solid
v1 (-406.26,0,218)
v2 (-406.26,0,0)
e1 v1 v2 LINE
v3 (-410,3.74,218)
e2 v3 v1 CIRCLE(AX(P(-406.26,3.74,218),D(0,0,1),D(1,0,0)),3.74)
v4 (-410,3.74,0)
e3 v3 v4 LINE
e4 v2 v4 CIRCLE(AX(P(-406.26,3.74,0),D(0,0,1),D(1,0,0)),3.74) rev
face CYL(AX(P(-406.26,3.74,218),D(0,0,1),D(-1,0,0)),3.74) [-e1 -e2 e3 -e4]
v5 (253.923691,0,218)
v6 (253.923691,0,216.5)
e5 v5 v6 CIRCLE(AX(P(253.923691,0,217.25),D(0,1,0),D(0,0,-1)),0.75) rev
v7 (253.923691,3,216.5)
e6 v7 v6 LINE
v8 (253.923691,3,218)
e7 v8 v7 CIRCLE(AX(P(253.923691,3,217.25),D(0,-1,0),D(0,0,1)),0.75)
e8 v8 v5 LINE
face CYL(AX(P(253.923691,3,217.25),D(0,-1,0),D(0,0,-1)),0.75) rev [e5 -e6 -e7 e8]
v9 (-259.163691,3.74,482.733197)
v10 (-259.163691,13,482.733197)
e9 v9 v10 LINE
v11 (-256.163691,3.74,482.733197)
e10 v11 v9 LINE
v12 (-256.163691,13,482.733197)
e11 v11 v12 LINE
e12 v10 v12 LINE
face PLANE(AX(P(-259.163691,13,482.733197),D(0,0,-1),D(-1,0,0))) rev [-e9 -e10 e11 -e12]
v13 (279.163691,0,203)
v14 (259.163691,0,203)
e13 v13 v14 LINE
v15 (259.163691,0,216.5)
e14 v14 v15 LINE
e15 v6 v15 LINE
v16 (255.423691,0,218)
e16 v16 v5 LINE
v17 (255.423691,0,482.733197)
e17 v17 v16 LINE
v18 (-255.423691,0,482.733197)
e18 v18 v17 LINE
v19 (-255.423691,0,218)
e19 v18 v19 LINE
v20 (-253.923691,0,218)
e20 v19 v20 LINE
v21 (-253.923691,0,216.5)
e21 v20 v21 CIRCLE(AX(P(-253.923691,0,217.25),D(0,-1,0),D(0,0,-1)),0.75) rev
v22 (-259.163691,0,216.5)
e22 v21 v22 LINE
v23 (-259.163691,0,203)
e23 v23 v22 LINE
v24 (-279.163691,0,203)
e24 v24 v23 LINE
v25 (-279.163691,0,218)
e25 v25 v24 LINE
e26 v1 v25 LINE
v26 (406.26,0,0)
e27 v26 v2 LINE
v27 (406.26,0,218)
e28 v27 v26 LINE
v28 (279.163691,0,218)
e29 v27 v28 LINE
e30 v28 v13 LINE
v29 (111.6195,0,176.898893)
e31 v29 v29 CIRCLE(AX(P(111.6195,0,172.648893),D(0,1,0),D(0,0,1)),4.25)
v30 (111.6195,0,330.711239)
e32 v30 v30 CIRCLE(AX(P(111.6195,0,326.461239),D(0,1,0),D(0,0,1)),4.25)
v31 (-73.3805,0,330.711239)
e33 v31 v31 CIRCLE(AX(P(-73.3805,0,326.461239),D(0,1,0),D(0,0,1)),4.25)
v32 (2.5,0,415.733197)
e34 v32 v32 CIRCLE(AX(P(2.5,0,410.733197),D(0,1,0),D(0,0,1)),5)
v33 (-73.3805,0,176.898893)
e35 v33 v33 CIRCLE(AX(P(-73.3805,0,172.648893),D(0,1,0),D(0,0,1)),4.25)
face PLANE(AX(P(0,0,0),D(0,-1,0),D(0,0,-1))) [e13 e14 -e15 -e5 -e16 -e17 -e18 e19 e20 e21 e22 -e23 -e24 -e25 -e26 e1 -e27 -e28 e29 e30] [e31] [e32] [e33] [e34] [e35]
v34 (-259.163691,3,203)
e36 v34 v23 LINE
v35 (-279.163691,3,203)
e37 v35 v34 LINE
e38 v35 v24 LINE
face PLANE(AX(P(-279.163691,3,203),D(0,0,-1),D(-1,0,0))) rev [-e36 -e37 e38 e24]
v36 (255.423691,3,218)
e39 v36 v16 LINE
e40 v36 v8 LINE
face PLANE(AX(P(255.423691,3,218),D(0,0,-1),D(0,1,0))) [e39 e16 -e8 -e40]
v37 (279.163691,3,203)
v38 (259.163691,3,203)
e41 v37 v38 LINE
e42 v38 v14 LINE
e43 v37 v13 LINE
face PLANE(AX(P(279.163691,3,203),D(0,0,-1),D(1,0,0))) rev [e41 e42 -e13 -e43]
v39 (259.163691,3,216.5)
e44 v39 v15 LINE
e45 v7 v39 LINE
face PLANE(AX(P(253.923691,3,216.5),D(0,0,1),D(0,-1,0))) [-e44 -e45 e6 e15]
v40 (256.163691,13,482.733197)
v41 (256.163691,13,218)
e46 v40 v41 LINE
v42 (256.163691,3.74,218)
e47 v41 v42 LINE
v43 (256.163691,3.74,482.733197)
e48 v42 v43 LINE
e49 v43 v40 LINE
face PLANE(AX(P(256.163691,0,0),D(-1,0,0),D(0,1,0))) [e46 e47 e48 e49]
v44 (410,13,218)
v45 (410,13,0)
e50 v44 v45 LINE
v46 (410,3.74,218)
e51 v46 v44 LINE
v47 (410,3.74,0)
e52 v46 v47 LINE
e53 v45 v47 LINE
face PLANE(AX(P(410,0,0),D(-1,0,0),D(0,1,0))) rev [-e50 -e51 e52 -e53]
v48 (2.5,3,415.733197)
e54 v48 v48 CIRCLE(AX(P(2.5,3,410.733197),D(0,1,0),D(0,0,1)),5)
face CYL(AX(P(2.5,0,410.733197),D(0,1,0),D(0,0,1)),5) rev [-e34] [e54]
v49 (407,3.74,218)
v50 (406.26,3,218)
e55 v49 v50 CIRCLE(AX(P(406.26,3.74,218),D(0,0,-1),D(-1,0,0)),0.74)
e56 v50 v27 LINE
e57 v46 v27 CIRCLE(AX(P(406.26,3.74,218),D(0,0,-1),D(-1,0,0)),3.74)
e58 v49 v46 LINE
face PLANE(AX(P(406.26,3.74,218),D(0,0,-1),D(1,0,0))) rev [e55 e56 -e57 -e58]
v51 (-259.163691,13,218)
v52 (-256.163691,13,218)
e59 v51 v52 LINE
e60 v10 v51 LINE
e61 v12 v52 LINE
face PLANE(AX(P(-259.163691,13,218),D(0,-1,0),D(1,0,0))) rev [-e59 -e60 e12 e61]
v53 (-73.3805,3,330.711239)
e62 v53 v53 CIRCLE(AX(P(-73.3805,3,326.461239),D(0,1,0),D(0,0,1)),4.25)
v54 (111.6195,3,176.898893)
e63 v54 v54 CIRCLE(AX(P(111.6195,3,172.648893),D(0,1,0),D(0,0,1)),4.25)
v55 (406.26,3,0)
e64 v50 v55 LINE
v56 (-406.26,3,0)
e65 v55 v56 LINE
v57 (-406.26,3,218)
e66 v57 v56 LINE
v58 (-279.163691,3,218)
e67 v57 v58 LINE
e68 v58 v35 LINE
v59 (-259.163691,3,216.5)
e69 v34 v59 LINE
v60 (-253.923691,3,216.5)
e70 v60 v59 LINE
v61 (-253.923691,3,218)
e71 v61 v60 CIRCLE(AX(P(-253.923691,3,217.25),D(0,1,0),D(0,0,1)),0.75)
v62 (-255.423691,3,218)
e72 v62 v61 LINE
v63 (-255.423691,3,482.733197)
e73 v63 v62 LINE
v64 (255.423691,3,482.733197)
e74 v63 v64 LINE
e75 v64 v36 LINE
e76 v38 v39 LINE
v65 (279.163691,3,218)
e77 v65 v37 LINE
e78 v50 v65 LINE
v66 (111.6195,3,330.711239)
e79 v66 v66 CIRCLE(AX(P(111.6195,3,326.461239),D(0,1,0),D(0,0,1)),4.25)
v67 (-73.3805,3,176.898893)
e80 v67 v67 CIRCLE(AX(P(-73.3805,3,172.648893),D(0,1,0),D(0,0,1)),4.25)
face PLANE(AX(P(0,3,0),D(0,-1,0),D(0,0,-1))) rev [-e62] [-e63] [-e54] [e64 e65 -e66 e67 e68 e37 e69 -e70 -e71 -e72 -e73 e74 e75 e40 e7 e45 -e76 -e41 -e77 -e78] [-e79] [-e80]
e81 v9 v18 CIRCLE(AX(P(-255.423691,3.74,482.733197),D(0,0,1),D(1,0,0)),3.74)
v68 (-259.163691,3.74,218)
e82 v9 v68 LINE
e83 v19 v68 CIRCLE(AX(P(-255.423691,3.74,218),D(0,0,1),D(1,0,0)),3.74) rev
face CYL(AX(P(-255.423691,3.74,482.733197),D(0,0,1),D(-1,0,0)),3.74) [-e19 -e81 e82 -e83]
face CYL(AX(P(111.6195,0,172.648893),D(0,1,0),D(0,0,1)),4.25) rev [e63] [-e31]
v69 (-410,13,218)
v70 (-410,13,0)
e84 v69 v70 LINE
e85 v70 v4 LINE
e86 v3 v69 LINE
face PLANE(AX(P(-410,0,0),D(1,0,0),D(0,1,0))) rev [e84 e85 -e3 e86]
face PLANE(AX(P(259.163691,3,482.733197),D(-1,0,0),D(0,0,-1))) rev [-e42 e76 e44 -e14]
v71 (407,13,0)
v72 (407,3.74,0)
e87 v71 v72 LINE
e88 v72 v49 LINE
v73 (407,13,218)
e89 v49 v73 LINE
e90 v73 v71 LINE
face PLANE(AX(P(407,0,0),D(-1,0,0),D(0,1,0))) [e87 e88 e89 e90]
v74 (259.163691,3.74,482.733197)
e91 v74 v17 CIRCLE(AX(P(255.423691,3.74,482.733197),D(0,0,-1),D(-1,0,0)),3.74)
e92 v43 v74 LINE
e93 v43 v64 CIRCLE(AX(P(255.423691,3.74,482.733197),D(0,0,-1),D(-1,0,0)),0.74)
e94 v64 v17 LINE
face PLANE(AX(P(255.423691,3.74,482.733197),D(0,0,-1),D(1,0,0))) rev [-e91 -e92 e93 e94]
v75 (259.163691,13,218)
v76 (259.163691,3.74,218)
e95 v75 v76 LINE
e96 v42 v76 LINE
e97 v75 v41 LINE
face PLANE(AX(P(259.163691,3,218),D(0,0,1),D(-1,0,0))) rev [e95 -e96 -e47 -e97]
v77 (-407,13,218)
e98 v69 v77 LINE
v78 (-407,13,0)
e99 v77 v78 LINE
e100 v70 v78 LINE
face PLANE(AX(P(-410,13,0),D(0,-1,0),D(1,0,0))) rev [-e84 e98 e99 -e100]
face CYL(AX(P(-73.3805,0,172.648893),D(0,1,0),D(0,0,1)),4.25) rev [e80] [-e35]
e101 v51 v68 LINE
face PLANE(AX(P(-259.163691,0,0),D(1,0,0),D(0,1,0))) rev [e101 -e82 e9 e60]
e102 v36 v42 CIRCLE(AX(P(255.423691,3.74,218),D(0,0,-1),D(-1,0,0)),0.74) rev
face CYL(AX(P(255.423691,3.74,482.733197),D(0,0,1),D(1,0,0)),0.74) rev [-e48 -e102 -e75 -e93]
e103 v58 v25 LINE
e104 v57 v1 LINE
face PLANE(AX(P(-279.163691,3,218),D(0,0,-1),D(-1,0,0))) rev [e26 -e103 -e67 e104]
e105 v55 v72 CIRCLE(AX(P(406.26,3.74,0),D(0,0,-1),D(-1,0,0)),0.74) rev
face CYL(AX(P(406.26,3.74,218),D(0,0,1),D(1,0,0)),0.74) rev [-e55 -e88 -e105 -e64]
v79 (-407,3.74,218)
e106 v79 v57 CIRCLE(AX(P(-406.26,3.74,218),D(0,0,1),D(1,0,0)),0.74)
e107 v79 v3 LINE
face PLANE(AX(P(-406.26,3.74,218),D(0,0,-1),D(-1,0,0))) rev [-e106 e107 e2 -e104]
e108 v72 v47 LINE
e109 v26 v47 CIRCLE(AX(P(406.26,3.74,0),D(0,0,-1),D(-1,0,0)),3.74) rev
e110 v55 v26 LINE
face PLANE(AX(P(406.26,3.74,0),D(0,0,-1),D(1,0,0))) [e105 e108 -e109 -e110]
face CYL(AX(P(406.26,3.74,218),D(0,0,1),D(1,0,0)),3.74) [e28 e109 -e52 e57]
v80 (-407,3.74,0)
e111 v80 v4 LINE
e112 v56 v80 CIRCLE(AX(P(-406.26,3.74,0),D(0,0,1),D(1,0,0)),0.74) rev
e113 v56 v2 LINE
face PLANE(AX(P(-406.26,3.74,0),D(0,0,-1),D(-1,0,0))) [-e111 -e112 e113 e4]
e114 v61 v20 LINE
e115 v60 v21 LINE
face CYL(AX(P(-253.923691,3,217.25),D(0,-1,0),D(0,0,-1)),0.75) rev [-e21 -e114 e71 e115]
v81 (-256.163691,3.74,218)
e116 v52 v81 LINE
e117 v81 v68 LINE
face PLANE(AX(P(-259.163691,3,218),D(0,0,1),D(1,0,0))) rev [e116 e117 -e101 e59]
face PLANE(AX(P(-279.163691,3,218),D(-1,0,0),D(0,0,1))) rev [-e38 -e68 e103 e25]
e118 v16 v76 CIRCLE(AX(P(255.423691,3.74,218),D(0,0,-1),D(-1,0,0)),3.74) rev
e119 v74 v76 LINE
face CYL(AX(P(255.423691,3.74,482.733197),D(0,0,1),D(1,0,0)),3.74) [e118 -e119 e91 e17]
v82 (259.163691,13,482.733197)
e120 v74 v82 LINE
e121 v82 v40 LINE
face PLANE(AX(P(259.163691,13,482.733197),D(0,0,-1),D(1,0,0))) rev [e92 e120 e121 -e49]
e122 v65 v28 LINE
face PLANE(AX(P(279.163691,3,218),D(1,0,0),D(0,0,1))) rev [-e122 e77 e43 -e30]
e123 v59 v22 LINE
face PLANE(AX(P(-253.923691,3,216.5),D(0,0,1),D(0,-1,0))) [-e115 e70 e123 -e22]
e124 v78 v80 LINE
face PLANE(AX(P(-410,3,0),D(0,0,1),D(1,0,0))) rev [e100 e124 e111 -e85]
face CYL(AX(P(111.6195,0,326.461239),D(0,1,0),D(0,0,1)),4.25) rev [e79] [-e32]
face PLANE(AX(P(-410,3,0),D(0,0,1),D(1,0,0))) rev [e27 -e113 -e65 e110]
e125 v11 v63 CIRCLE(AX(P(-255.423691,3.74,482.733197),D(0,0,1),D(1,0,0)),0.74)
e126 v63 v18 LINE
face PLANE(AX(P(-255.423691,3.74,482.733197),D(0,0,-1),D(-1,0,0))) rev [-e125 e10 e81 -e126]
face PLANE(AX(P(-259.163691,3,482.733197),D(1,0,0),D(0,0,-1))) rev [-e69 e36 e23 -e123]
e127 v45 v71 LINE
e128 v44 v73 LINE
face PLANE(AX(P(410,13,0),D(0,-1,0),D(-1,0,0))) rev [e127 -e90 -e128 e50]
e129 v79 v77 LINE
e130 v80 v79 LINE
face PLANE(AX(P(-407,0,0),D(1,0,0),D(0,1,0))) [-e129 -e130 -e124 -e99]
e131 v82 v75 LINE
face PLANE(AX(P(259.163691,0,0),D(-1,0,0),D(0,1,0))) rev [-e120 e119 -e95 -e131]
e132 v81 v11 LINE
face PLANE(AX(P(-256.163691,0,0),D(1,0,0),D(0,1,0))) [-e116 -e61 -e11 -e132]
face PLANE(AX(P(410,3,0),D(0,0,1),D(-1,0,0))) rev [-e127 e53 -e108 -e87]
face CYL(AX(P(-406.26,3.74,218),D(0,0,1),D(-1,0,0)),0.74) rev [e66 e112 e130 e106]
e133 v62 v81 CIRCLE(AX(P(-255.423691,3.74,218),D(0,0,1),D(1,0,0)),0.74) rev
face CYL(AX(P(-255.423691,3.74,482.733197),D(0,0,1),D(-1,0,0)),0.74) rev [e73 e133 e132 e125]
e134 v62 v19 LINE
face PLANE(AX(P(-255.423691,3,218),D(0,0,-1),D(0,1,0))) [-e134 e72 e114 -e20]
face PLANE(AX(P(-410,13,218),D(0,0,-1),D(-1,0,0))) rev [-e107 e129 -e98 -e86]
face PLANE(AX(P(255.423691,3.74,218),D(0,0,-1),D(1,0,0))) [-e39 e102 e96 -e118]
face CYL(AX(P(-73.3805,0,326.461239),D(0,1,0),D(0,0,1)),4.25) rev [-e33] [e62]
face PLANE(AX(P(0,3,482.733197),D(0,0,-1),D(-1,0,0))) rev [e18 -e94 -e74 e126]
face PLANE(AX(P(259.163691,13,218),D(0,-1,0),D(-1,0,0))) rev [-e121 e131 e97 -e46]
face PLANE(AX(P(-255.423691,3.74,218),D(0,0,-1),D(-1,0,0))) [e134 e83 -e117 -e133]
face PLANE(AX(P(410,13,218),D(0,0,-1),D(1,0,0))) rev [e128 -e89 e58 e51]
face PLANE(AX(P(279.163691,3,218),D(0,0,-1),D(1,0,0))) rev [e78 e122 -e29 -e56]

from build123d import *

# Parameters (mm, degrees)
SM_BASE_FLANGE_1_DEPTH   = 3
SM_START                 = 216.5
SM_EDGE_FLANGE_1_DEPTH   = 266.233197448
SM_EDGE_FLANGE_1_2_DEPTH = 216.5
SM_START_2               = 218
SM_EDGE_FLANGE_1_3_DEPTH = 264.733197448
SM_EDGE_FLANGE_1_4_DEPTH = 218
SM_START_3               = -1
SM_EDGE_FLANGE_1_5_DEPTH = 4.74
SKETCH_14_R              = 5
SKETCH_14_R_2            = 4.25
CUT_EXTRUDE_1_DEPTH      = 10


with BuildPart() as part:
    # Базовая кромка1: sheet metal written as solids
    # Sketch 1 → Базовая кромка1 (new body)
    with BuildSketch(Plane(origin=(0, 0, 0), x_dir=(1, 0, 0), z_dir=(0, 1, 0))):
        Polygon((-410, 0), (0, 0), (0, -482.733197448), (-259.163690552, -482.733197448), (-259.163690552, -203), (-279.163690552, -203), (-279.163690552, -218), (-410, -218), align=None)
    extrude(amount=SM_BASE_FLANGE_1_DEPTH)

    # Ребро-кромка1: read off the stored shape, not the designer's step
    # Ребро-кромка1 outline → Ребро-кромка1 (cut)
    with BuildSketch(Plane.XY.offset(SM_START)):
        with BuildLine():
            ThreePointArc((-255.423690552, 0), (-257.792234409, 0.845591597), (-259.089751108, 3))
            Line((-259.089751108, 3), (-259.163690552, 3))
            Line((-259.163690552, 3), (-259.163690552, 0))
            Line((-259.163690552, 0), (-255.423690552, 0))
        make_face()
        with BuildLine():
            Line((-410, 0), (-406.26, 0))
            ThreePointArc((-406.26, 0), (-408.628543857, 0.845591597), (-409.926060556, 3))
            Line((-409.926060556, 3), (-410, 3))
            Line((-410, 3), (-410, 0))
        make_face()
    extrude(amount=SM_EDGE_FLANGE_1_DEPTH, mode=Mode.SUBTRACT)

    # Sm Edge Flange 1 2 outline → Sm Edge Flange 1 2 (cut)
    with BuildSketch(Plane.XY):
        with BuildLine():
            Line((-410, 0), (-406.26, 0))
            ThreePointArc((-406.26, 0), (-408.628543857, 0.845591597), (-409.926060556, 3))
            Line((-409.926060556, 3), (-410, 3))
            Line((-410, 3), (-410, 0))
        make_face()
    extrude(amount=SM_EDGE_FLANGE_1_2_DEPTH, mode=Mode.SUBTRACT)

    # Sm Edge Flange 1 3 outline → Sm Edge Flange 1 3 (add)
    with BuildSketch(Plane.XY.offset(SM_START_2)):
        with BuildLine():
            Line((-259.163690552, 13), (-259.163690552, 3.74))
            ThreePointArc((-259.163690552, 3.74), (-259.145159783, 3.368157614), (-259.089751108, 3))
            Line((-259.089751108, 3), (-255.423690552, 3))
            ThreePointArc((-255.423690552, 3), (-255.94694957, 3.216740982), (-256.163690552, 3.74))
            Line((-256.163690552, 3.74), (-256.163690552, 13))
            Line((-256.163690552, 13), (-259.163690552, 13))
        make_face()
    extrude(amount=SM_EDGE_FLANGE_1_3_DEPTH)

    # Sm Edge Flange 1 4 outline → Sm Edge Flange 1 4 (add)
    with BuildSketch(Plane.XY):
        with BuildLine():
            Line((-409.926060556, 3), (-406.26, 3))
            ThreePointArc((-406.26, 3), (-406.783259018, 3.216740982), (-407, 3.74))
            Line((-407, 3.74), (-407, 13))
            Line((-407, 13), (-410, 13))
            Line((-410, 13), (-410, 3.74))
            ThreePointArc((-410, 3.74), (-409.981469231, 3.368157614), (-409.926060556, 3))
        make_face()
    extrude(amount=SM_EDGE_FLANGE_1_4_DEPTH)

    # Sm Edge Flange 1 5 outline → Sm Edge Flange 1 5 (cut)
    with BuildSketch(Plane(origin=(0, 0, 0), x_dir=(1, 0, 0), z_dir=(0, 1, 0)).offset(SM_START_3)):
        with BuildLine():
            Line((-260, -218), (-253.923690552, -218))
            ThreePointArc((-253.923690552, -218), (-253.173690552, -217.25), (-253.923690552, -216.5))
            Line((-253.923690552, -216.5), (-260, -216.5))
            Line((-260, -216.5), (-260, -218))
        make_face()
    extrude(amount=SM_EDGE_FLANGE_1_5_DEPTH, mode=Mode.SUBTRACT)

    # Зеркальное отражение1: part across plane


with BuildPart() as part_1:
    add(part.part)
    add(part.part.mirror(Plane(origin=(0, 3, 0), x_dir=(0, 0, 1), z_dir=(-1, 0, 0))))

    # Эскиз14 → Вырез-Вытянуть1 (cut)
    with BuildSketch(Plane(origin=(0, 3, 0), x_dir=(1, 0, 0), z_dir=(0, 1, 0))):
        with Locations(Location((2.5, -410.733197448, 0), (0, 0, 270))):
            Circle(SKETCH_14_R)
        with Locations(Location((111.6195, -172.648893261, 0), (0, 0, 270))):
            Circle(SKETCH_14_R_2)
        with Locations(Location((111.6195, -326.461239213, 0), (0, 0, 270))):
            Circle(SKETCH_14_R_2)
        with Locations(Location((-73.3805, -326.461239213, 0), (0, 0, 270))):
            Circle(SKETCH_14_R_2)
        with Locations(Location((-73.3805, -172.648893261, 0), (0, 0, 270))):
            Circle(SKETCH_14_R_2)
    extrude(amount=-CUT_EXTRUDE_1_DEPTH, mode=Mode.SUBTRACT)


solid = part_1.part
